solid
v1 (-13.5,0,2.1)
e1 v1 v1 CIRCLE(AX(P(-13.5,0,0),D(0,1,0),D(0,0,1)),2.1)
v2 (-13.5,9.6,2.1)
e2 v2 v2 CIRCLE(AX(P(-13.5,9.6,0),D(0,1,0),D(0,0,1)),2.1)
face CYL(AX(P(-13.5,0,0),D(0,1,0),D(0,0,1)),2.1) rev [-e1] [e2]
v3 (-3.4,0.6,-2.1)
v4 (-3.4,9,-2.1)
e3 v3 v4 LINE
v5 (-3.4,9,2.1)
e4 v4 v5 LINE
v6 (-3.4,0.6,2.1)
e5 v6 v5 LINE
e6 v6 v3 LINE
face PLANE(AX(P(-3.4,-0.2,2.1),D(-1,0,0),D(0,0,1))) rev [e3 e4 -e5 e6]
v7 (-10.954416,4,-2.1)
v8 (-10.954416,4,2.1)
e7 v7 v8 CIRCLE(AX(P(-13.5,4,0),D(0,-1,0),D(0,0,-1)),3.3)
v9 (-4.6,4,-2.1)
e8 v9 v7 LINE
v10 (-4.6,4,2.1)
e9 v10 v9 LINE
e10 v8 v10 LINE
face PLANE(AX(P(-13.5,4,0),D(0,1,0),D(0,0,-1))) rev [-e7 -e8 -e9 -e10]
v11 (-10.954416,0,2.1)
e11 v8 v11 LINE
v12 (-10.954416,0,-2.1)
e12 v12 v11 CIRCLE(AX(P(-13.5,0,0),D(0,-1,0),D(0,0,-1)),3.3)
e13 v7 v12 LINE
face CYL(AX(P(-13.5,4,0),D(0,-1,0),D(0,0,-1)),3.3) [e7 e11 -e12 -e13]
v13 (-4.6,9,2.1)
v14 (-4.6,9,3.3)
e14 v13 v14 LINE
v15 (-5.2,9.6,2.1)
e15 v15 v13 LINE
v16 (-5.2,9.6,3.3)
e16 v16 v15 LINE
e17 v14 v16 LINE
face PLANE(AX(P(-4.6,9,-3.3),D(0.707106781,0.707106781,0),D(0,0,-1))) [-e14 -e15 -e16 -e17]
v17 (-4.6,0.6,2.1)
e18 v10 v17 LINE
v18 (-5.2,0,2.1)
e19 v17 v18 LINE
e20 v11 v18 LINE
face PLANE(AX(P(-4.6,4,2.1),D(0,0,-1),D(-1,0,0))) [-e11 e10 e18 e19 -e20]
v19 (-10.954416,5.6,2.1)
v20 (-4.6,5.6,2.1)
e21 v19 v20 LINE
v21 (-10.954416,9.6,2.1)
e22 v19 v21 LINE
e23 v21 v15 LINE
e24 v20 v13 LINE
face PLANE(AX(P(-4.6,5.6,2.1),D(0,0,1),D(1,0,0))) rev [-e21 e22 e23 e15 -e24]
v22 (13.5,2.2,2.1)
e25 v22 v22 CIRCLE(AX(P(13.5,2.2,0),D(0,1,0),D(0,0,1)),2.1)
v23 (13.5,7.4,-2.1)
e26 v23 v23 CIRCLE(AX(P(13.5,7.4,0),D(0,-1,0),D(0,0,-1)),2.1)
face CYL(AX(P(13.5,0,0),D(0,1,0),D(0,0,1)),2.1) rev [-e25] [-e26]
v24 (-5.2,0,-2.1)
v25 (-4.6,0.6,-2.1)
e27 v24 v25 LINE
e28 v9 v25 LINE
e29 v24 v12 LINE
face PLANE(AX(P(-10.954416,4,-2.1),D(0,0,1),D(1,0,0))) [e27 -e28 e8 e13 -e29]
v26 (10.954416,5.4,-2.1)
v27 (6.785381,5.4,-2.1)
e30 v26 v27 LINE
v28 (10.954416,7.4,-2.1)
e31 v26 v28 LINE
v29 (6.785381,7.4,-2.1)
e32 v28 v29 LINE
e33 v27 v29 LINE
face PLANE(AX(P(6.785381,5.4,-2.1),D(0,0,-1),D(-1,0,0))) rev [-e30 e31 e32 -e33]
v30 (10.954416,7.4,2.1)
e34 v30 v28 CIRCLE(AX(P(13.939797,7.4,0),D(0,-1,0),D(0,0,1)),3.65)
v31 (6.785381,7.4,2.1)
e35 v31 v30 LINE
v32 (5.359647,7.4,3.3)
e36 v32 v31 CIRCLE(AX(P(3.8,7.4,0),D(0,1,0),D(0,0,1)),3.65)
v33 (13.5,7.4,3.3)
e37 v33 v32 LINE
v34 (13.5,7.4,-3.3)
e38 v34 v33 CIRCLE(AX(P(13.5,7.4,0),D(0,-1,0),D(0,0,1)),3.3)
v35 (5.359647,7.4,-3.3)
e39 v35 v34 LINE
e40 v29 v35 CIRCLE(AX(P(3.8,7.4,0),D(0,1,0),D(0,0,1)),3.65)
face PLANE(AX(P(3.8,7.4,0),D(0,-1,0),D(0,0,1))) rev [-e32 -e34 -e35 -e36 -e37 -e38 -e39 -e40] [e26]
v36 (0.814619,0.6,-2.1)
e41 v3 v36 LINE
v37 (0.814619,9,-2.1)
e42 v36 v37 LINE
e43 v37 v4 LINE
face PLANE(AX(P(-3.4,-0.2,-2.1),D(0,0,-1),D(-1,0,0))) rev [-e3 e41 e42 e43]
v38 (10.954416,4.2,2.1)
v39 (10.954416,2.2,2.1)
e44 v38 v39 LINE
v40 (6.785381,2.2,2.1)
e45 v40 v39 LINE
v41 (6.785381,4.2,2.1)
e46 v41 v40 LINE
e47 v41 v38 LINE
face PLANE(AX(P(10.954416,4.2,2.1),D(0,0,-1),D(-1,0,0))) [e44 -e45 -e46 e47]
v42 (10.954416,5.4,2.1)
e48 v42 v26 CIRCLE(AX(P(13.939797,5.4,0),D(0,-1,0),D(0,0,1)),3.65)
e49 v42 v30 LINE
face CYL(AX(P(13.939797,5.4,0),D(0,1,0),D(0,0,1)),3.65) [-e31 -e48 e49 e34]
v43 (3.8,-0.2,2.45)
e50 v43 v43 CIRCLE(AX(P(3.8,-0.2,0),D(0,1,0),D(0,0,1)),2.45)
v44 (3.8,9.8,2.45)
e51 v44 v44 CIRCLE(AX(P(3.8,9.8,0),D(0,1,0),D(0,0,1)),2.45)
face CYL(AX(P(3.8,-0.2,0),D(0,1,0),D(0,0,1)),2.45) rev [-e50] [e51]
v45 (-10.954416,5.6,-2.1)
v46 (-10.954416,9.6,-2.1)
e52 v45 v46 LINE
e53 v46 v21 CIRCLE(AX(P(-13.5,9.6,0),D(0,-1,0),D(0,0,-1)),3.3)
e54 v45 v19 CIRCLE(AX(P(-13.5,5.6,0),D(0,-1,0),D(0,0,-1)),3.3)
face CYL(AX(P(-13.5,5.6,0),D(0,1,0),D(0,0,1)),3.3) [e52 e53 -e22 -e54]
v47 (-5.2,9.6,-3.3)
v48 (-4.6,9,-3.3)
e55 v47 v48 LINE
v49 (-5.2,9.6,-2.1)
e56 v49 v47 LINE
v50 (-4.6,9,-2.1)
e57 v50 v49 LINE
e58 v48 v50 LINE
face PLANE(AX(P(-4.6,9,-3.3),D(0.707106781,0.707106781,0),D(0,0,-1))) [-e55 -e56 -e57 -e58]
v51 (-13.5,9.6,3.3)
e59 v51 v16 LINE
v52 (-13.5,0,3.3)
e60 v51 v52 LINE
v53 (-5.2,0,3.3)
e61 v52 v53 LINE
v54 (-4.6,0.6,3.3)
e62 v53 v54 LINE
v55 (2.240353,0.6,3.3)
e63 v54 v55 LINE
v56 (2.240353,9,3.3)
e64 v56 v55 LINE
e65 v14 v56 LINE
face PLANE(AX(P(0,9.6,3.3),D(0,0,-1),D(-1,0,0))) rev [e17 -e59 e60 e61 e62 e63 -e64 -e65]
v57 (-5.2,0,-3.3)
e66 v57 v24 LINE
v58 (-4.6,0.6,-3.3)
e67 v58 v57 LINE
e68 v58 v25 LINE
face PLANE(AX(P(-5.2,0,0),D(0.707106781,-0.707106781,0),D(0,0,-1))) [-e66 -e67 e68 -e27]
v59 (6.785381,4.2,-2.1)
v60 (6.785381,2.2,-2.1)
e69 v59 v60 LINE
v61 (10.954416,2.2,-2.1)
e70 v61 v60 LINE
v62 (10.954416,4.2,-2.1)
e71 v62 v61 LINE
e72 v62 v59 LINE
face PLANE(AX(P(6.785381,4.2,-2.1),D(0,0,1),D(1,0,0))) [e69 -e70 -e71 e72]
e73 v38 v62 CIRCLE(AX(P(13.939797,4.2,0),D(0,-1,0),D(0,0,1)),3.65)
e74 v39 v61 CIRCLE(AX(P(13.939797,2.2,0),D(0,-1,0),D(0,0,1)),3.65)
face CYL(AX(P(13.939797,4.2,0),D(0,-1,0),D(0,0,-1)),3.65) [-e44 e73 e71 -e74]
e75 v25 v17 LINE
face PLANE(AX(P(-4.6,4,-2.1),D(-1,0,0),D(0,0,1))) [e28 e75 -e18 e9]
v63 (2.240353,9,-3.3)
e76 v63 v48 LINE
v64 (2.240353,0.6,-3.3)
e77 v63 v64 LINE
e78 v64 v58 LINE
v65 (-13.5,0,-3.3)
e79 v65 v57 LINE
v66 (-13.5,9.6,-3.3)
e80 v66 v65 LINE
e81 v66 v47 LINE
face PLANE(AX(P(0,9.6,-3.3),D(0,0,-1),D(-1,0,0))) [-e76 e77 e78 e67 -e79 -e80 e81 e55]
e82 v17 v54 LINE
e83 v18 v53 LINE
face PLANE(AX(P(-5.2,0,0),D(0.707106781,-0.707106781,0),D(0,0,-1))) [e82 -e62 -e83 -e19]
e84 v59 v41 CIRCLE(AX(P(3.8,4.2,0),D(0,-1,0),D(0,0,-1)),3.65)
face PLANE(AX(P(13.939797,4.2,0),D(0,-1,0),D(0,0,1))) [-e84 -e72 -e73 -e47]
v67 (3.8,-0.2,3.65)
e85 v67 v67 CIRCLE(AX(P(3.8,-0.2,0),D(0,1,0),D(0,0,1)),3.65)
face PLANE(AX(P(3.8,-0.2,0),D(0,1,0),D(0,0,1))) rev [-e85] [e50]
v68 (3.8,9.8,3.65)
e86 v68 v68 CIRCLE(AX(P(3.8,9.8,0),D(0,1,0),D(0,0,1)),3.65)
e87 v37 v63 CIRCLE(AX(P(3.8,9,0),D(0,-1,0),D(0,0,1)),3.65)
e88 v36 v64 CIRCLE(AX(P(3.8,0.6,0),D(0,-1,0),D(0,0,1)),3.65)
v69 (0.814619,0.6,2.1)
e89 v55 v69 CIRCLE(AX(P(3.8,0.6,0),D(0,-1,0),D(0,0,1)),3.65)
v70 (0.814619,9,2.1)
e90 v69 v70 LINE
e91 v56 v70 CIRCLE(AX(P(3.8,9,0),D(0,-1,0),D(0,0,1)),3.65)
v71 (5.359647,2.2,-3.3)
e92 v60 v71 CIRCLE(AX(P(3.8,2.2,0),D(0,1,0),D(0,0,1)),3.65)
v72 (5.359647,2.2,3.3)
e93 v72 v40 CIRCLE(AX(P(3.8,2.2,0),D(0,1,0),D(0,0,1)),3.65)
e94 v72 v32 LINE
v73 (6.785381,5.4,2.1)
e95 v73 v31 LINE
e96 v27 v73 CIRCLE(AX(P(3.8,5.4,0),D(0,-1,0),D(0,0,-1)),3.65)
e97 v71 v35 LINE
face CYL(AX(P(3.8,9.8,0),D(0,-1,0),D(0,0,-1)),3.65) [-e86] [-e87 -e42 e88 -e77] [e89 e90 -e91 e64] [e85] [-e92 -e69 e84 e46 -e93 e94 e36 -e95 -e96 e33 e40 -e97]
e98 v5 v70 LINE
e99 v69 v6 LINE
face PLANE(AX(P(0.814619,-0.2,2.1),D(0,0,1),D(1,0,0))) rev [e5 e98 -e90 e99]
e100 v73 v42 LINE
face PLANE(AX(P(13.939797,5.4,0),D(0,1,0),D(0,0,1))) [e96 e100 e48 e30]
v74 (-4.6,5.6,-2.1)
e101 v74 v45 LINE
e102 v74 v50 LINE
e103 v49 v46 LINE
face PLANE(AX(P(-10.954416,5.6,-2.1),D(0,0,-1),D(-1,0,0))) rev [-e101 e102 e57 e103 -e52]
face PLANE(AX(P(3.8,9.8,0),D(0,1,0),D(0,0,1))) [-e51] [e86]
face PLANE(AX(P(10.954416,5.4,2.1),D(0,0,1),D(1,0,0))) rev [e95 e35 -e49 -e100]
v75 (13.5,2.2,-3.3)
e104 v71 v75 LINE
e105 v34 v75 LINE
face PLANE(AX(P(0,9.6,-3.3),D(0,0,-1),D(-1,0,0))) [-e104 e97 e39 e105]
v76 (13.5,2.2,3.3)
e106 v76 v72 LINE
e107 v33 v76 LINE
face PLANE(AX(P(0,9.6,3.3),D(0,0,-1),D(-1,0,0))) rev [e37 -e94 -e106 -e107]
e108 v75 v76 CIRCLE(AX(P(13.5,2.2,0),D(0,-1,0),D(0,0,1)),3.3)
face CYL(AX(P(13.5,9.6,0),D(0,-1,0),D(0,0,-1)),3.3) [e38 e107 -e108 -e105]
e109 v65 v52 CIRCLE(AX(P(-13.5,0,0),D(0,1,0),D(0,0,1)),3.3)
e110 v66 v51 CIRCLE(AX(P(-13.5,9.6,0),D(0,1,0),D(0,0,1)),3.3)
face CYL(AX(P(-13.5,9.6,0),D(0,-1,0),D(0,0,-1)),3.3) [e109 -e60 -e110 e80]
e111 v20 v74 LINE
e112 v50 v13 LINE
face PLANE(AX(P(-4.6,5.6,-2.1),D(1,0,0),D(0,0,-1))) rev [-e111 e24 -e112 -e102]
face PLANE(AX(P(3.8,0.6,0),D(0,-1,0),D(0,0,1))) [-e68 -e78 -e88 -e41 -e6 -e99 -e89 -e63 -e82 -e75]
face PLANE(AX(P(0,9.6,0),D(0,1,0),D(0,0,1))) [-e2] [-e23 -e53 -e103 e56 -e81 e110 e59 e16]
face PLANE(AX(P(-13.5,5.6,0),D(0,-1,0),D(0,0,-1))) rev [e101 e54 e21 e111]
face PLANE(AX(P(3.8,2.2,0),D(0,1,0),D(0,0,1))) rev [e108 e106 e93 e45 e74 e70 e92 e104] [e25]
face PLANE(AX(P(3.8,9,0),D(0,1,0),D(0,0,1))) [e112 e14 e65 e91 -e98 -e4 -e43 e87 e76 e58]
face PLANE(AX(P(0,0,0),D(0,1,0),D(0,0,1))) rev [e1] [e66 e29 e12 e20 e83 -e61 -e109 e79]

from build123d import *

# Parameters (mm, degrees)
BOSS_EXTRUDE1_DEPTH = 9.6
SKETCH2_R           = 2.1
CUT_EXTRUDE1_DEPTH  = 20.628805364
SKETCH3_R           = 3.65
BOSS_EXTRUDE5_DEPTH = 5
SKETCH3_4_R         = 2.45
CUT_EXTRUDE4_DEPTH  = 5
CUT_EXTRUDE5_DEPTH  = 0.6
CUT_EXTRUDE6_DEPTH  = 2.2
CUT_EXTRUDE7_DEPTH  = 2
CUT_EXTRUDE8_START  = -4
CUT_EXTRUDE8_DEPTH  = 4
CHAMFER1_SIZE       = 0.6
CUT_EXTRUDE9_DEPTH  = 20.498782013


with BuildPart() as part:
    # Sketch1 → Boss-Extrude1 (new body)
    with BuildSketch(Plane(origin=(0, 0, 0), x_dir=(1, 0, 0), z_dir=(0, 1, 0))):
        with BuildLine():
            ThreePointArc((13.5, 3.3), (16.8, 0), (13.5, -3.3))
            Line((13.5, -3.3), (-13.5, -3.3))
            ThreePointArc((-13.5, -3.3), (-16.8, 0), (-13.5, 3.3))
            Line((-13.5, 3.3), (13.5, 3.3))
        make_face()
    extrude(amount=BOSS_EXTRUDE1_DEPTH)

    # Sketch2 → Cut-Extrude1 (cut, through all)
    with BuildSketch(Plane(origin=(0, 9.6, 0), x_dir=(1, 0, 0), z_dir=(0, 1, 0))):
        with Locations(Location((-13.5, 0, 0), (0, 0, 270))):
            Circle(SKETCH2_R)
    cut_extrude1 = extrude(amount=-CUT_EXTRUDE1_DEPTH, mode=Mode.SUBTRACT)

    # Mirror1: Cut-Extrude1 across plane
    add(cut_extrude1.mirror(Plane(origin=(0, 0, 0), x_dir=(0, 0, 1), z_dir=(1, 0, 0))), mode=Mode.SUBTRACT)

    # Sketch3 → Boss-Extrude5 (add, symmetric)
    with BuildSketch(Plane(origin=(0, 4.8, 0), x_dir=(1, 0, 0), z_dir=(0, 1, 0))):
        with Locations(Location((3.8, 0, 0), (0, 0, 270))):
            Circle(SKETCH3_R)
    extrude(amount=BOSS_EXTRUDE5_DEPTH, both=True)

    # Sketch3<4> → Cut-Extrude4 (cut, symmetric)
    with BuildSketch(Plane(origin=(0, 4.8, 0), x_dir=(1, 0, 0), z_dir=(0, 1, 0))):
        with Locations(Location((3.8, 0, 0), (0, 0, 270))):
            Circle(SKETCH3_4_R)
    extrude(amount=CUT_EXTRUDE4_DEPTH, both=True, mode=Mode.SUBTRACT)

    # Sketch6 → Cut-Extrude5 (cut)
    with BuildSketch(Plane(origin=(0, 9.6, 0), x_dir=(1, 0, 0), z_dir=(0, 1, 0))):
        with BuildLine():
            Line((-4.6, 3.3), (-4.6, -3.3))
            Line((-4.6, -3.3), (2.240352604, -3.3))
            ThreePointArc((2.240352604, -3.3), (0.15, 0), (2.240352604, 3.3))
            Line((2.240352604, 3.3), (-4.6, 3.3))
        make_face()
    cut_extrude5 = extrude(amount=-CUT_EXTRUDE5_DEPTH, mode=Mode.SUBTRACT)

    # Mirror2: Cut-Extrude5 across plane
    add(cut_extrude5.mirror(Plane.ZX.offset(4.8)), mode=Mode.SUBTRACT)

    # Sketch8 → Cut-Extrude6 (cut)
    with BuildSketch(Plane.XZ):
        with BuildLine():
            Line((13.5, 3.3), (5.359647396, 3.3))
            ThreePointArc((5.359647396, 3.3), (7.45, 0), (5.359647396, -3.3))
            Line((5.359647396, -3.3), (13.5, -3.3))
            ThreePointArc((13.5, -3.3), (16.8, 0), (13.5, 3.3))
        make_face()
    cut_extrude6 = extrude(amount=-CUT_EXTRUDE6_DEPTH, mode=Mode.SUBTRACT)

    # Mirror3: Cut-Extrude6 across plane
    add(cut_extrude6.mirror(Plane.ZX.offset(4.8)), mode=Mode.SUBTRACT)

    # Sketch9 → Cut-Extrude7 (cut)
    with BuildSketch(Plane(origin=(0, 7.4, 0), x_dir=(1, 0, 0), z_dir=(0, 1, 0))):
        with BuildLine():
            Line((6.785381048, 2.1), (10.954415588, 2.1))
            ThreePointArc((10.954415588, 2.1), (10.289796635, 0), (10.954415588, -2.1))
            Line((10.954415588, -2.1), (6.785381048, -2.1))
            ThreePointArc((6.785381048, -2.1), (7.45, 0), (6.785381048, 2.1))
        make_face()
    cut_extrude7 = extrude(amount=-CUT_EXTRUDE7_DEPTH, mode=Mode.SUBTRACT)

    # Mirror4: Cut-Extrude7 across plane
    add(cut_extrude7.mirror(Plane.ZX.offset(4.8)), mode=Mode.SUBTRACT)

    # Sketch11 → Cut-Extrude8 (cut)
    with BuildSketch(Plane(origin=(0, 9.6, 0), x_dir=(1, 0, 0), z_dir=(0, 1, 0)).offset(CUT_EXTRUDE8_START)):
        with BuildLine():
            Line((-10.954415588, 2.1), (-4.6, 2.1))
            Line((-4.6, 2.1), (-4.6, -2.1))
            Line((-4.6, -2.1), (-10.954415588, -2.1))
            ThreePointArc((-10.954415588, -2.1), (-10.2, 0), (-10.954415588, 2.1))
        make_face()
    cut_extrude8 = extrude(amount=CUT_EXTRUDE8_DEPTH, mode=Mode.SUBTRACT)

    # Mirror7: Cut-Extrude8 across plane
    add(cut_extrude8.mirror(Plane.ZX.offset(4.8)), mode=Mode.SUBTRACT)

    # Chamfer1
    chamfer1_edges = [part.edges().sort_by_distance(p)[0] for p in [
        (-4.6, 9.6, 2.7),
        (-4.6, 9.6, -2.7),
        (-4.6, 0, -2.7),
        (-4.6, 0, 2.7),
    ]]
    chamfer(chamfer1_edges, length=CHAMFER1_SIZE - 0.0001)  # a hair under: the kernel refuses the full size

    # Sketch13 → Cut-Extrude9 (cut, through all)
    with BuildSketch(Plane(origin=(0, 9, 0), x_dir=(1, 0, 0), z_dir=(0, 1, 0))):
        with BuildLine():
            Line((0.814618952, -2.1), (-3.4, -2.1))
            Line((-3.4, -2.1), (-3.4, 2.1))
            Line((-3.4, 2.1), (0.814618952, 2.1))
            ThreePointArc((0.814618952, 2.1), (0.15, 0), (0.814618952, -2.1))
        make_face()
    extrude(amount=-CUT_EXTRUDE9_DEPTH, mode=Mode.SUBTRACT)


solid = part.part
